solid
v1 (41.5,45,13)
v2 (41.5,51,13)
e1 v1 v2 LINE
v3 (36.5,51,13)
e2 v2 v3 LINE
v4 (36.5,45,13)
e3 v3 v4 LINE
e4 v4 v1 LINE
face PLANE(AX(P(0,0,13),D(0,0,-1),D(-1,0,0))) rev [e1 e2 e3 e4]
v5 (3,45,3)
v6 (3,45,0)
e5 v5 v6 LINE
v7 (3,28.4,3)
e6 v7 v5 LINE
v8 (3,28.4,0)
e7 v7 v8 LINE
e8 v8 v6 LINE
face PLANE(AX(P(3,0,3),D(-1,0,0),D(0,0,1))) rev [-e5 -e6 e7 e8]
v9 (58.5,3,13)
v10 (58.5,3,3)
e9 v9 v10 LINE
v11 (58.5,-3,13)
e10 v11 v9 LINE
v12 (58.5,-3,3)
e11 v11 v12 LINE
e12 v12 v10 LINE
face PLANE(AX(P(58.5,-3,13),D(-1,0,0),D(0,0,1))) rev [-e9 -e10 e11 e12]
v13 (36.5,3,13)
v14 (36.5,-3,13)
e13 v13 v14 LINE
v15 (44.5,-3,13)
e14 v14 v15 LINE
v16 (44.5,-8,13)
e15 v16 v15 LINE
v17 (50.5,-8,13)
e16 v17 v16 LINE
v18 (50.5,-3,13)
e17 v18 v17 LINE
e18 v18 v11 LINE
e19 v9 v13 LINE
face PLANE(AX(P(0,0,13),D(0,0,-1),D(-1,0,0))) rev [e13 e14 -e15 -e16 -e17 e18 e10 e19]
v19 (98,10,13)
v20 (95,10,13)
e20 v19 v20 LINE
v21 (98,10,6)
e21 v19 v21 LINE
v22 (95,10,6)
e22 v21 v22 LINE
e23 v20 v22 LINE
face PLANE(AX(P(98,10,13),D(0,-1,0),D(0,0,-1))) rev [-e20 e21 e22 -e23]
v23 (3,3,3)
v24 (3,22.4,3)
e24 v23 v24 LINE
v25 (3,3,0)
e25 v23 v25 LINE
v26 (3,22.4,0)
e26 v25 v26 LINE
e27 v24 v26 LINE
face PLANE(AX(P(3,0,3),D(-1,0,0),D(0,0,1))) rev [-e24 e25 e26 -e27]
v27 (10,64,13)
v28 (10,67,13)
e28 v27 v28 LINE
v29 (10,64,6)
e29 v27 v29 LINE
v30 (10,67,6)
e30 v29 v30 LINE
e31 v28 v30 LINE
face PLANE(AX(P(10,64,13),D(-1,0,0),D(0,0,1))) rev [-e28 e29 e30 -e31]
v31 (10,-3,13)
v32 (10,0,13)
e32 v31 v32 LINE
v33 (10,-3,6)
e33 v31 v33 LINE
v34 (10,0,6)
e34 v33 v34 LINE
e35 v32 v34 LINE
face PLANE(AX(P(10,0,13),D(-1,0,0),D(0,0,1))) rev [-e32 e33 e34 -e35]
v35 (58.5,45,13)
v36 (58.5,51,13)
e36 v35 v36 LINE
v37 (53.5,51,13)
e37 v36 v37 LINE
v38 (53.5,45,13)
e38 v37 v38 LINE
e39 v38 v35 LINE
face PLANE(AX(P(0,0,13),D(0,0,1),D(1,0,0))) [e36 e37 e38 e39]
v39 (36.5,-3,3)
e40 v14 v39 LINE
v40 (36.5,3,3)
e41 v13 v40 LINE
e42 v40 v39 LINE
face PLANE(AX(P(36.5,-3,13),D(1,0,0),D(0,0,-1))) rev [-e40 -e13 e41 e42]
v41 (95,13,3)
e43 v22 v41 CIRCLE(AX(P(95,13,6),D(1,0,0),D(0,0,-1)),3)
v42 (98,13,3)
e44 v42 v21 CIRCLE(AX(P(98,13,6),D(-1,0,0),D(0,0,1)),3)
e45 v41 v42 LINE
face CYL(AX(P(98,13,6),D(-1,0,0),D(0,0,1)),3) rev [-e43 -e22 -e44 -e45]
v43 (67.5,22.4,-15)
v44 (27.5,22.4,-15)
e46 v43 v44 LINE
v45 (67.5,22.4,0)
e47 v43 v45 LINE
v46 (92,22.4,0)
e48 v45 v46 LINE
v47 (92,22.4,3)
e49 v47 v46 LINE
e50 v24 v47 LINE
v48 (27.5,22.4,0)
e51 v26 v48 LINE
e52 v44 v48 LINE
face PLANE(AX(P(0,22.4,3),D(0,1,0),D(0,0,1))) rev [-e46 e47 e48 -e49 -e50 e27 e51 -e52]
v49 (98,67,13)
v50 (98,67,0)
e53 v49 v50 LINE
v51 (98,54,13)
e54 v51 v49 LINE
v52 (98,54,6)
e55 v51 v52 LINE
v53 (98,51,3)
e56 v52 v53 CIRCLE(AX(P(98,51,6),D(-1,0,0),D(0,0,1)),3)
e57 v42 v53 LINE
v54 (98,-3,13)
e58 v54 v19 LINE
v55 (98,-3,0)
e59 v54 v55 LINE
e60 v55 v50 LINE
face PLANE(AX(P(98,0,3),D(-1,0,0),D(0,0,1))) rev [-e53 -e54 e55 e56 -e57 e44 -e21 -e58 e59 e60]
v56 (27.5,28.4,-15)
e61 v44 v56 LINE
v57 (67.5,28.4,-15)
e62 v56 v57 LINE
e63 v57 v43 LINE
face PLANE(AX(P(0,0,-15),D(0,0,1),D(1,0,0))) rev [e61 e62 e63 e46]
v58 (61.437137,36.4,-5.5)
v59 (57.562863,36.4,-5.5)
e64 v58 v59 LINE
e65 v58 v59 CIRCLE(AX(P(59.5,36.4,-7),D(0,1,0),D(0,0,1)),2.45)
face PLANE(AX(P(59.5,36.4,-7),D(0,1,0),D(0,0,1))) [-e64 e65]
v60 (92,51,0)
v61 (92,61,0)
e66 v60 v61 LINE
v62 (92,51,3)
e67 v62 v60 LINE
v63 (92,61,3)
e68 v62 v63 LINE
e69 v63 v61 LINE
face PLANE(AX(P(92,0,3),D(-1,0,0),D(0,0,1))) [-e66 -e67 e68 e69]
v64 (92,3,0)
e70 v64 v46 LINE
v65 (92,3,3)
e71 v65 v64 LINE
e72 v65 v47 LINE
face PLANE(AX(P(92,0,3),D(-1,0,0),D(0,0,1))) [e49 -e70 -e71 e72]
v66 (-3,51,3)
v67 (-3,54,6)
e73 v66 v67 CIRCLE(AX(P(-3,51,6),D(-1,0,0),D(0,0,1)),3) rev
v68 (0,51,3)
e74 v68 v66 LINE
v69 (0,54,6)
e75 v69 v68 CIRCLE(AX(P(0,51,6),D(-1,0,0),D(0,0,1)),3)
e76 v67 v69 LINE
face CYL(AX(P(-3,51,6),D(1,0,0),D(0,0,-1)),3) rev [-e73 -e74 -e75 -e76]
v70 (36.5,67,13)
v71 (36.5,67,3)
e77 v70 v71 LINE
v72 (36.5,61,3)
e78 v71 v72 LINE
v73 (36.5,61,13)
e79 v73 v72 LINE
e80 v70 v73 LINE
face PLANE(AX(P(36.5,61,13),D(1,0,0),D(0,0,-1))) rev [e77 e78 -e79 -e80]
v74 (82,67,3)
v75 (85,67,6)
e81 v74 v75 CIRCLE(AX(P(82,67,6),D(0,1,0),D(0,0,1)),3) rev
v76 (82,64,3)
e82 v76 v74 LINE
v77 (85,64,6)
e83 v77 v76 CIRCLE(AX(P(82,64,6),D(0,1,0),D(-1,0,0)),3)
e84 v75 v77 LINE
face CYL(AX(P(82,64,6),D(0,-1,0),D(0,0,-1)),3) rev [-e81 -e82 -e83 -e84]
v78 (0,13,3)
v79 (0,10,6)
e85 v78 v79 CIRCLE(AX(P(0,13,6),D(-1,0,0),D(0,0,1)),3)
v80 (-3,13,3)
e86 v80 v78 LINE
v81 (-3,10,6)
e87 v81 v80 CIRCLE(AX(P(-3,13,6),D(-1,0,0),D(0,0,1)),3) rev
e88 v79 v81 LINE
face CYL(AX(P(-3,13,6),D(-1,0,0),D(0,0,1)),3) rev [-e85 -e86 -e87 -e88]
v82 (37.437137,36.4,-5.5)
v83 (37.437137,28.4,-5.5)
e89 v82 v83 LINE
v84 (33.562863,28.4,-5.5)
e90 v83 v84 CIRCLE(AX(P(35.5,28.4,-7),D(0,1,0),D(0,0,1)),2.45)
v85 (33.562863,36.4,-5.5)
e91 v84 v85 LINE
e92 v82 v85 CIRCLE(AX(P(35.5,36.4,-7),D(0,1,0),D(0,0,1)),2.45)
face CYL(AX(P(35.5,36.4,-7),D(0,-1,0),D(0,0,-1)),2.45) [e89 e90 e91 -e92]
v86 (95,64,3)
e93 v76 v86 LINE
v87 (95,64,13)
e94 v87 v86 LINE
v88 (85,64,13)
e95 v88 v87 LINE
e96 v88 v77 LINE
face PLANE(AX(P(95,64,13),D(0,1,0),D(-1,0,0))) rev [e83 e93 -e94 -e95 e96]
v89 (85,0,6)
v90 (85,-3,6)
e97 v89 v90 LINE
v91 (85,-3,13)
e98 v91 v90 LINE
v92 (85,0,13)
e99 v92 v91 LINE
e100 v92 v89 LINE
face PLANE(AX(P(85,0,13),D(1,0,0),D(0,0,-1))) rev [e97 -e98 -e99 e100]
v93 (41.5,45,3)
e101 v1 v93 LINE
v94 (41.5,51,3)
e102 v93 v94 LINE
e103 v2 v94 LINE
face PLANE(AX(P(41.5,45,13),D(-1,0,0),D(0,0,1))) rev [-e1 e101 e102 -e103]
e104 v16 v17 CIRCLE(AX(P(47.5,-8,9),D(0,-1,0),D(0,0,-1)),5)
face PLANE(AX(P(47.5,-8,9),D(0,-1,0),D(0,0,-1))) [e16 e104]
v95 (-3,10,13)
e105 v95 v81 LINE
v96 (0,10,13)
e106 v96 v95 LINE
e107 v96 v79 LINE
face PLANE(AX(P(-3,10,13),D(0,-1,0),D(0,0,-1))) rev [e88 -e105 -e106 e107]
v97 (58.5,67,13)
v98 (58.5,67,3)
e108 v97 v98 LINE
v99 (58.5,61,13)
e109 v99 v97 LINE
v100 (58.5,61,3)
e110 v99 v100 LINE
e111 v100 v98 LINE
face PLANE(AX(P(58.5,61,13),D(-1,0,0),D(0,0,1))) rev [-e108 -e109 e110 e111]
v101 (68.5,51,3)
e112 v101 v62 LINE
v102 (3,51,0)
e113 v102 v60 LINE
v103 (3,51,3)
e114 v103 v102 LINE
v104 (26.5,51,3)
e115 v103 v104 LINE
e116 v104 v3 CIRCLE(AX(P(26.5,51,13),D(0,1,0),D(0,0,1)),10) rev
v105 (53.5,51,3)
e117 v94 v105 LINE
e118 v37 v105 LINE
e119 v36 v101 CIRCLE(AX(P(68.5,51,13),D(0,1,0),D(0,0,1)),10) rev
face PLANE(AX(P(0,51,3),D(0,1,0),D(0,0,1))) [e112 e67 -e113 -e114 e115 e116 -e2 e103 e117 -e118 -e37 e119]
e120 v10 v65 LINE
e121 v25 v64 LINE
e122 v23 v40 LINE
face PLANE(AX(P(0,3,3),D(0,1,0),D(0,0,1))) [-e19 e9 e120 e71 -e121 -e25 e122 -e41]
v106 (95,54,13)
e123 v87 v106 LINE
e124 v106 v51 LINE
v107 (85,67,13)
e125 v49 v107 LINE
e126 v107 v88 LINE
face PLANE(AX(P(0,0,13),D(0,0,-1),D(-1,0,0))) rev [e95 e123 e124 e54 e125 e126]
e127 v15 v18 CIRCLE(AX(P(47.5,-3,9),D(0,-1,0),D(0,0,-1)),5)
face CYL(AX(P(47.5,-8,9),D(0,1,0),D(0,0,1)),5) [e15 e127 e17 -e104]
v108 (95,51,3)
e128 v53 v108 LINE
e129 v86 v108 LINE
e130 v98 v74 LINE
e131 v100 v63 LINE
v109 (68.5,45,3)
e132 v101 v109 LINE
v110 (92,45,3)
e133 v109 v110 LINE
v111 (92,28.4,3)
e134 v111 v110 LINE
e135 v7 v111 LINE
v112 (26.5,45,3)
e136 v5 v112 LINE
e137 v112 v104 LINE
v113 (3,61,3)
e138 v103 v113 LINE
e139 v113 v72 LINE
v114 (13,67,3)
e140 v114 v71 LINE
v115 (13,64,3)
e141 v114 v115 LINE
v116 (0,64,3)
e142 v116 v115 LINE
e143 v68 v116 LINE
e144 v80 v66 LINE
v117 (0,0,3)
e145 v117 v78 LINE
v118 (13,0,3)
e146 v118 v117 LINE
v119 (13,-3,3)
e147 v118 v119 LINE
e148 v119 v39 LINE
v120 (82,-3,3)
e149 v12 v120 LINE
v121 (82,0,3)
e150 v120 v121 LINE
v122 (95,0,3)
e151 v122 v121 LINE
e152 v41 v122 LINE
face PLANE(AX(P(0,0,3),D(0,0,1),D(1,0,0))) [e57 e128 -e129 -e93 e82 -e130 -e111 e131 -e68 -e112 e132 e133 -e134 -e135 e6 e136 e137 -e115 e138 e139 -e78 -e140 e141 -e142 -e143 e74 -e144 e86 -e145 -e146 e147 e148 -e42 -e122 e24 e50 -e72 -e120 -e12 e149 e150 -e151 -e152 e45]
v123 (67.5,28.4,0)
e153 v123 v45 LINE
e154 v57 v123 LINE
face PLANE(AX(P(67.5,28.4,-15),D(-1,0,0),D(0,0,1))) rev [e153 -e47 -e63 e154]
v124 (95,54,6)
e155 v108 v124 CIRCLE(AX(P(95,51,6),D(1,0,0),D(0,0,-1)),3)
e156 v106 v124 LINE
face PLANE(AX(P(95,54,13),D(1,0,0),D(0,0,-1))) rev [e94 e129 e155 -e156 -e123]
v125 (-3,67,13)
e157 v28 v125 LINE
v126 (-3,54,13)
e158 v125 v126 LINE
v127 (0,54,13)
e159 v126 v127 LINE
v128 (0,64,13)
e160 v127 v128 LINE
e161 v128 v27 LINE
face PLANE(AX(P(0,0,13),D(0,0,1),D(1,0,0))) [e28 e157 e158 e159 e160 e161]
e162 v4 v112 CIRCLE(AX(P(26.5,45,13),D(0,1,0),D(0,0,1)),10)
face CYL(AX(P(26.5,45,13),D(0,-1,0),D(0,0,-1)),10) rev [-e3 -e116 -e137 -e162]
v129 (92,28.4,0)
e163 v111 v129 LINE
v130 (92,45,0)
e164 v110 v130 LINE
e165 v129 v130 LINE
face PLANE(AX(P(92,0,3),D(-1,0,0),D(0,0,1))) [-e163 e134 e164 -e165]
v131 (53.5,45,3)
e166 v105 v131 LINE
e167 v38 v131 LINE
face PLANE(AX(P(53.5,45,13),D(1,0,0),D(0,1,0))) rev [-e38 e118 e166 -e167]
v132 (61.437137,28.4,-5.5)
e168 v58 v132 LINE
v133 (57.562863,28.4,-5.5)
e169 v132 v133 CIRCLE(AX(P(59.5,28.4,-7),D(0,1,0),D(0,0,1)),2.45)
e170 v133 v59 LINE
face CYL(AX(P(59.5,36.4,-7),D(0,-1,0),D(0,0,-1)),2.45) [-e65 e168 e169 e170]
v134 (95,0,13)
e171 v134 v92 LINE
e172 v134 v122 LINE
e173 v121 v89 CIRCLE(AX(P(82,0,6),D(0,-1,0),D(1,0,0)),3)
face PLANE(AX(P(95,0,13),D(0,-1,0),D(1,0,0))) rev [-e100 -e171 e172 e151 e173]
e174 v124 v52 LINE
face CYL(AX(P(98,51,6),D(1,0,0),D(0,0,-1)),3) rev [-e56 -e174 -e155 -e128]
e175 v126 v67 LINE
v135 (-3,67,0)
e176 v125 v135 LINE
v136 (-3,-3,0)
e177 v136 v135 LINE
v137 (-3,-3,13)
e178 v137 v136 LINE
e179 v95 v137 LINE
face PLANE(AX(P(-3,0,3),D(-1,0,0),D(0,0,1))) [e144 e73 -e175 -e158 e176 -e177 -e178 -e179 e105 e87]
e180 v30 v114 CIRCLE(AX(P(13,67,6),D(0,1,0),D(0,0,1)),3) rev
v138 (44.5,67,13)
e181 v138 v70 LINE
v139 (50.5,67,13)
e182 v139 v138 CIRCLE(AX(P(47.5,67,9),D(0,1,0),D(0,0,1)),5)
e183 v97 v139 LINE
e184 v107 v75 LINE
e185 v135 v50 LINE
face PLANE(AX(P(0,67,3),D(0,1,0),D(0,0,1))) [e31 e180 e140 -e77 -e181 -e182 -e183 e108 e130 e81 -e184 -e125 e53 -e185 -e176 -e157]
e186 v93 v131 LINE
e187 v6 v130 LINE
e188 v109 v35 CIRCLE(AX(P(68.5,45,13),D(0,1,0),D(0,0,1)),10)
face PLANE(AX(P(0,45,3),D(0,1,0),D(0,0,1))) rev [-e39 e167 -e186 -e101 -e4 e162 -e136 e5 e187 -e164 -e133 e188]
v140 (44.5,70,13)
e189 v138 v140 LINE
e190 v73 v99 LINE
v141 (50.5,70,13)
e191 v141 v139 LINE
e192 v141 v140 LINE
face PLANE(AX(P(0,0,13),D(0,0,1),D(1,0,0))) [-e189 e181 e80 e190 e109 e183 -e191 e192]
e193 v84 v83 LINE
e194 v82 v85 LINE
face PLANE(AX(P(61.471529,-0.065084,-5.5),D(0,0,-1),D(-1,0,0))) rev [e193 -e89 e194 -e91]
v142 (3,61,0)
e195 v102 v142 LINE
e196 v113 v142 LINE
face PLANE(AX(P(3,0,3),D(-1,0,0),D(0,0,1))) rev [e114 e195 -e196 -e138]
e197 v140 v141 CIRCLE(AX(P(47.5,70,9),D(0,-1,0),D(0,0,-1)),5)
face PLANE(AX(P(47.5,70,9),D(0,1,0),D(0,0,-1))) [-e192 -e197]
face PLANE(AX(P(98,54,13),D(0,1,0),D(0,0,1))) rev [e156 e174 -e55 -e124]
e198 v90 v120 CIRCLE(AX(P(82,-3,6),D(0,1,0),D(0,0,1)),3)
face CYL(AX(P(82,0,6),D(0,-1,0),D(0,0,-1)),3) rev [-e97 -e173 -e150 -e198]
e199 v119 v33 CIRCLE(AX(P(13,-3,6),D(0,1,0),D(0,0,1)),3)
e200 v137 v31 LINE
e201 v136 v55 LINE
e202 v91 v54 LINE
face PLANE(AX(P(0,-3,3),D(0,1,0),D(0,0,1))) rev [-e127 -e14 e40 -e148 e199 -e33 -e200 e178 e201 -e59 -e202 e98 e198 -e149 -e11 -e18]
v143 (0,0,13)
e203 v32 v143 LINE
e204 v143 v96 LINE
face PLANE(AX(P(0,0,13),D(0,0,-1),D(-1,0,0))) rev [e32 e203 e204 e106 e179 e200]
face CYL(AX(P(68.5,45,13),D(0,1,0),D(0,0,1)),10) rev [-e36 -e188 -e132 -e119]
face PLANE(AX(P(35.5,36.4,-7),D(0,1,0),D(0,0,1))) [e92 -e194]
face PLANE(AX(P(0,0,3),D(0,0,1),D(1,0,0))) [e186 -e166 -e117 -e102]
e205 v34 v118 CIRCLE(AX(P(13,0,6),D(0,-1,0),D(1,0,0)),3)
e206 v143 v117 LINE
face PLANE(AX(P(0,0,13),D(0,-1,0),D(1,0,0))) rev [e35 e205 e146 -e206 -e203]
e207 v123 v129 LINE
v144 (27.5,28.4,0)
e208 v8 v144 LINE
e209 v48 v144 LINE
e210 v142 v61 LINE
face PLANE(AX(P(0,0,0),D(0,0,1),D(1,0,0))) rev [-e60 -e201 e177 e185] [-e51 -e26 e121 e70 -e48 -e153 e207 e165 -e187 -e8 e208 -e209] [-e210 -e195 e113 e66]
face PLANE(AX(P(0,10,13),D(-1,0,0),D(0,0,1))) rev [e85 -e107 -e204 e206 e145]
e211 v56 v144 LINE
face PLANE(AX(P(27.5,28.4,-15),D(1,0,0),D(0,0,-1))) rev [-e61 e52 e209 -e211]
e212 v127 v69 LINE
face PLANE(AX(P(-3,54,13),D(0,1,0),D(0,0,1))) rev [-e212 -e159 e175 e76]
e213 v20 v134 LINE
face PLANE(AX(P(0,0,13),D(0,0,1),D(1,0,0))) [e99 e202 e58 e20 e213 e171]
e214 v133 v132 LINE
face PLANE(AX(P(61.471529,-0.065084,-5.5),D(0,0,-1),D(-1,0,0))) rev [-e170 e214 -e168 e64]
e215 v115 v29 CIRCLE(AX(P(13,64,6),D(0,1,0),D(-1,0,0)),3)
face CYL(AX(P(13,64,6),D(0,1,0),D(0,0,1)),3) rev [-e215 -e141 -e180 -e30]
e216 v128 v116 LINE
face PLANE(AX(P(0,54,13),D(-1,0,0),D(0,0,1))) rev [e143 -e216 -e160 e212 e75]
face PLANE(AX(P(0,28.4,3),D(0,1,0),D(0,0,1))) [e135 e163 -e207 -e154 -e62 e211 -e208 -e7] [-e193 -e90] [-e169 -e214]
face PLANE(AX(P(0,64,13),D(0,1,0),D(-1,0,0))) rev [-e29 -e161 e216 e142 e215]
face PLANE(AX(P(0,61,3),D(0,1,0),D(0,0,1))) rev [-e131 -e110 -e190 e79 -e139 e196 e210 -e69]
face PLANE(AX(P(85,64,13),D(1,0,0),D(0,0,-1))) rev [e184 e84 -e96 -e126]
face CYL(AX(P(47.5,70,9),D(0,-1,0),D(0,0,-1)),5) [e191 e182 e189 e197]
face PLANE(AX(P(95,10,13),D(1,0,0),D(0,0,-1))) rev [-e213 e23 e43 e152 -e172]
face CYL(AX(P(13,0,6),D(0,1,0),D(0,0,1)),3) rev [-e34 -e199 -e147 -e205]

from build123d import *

# Parameters (mm, degrees)
CROQUIS1_W              = 101
CROQUIS1_H              = 70
CROQUIS1_W_2            = 89
CROQUIS1_H_2            = 58
CROQUIS1_H_3            = 6
SALIENTE_EXTRUIR1_DEPTH = 3
SALIENTE_EXTRUIR2_DEPTH = 10
CROQUIS3_W              = 5
CROQUIS3_H              = 6
SALIENTE_EXTRUIR3_DEPTH = 10
REDONDEO1_R             = 10
REDONDEO2_R             = 3
CROQUIS5_W              = 40
CROQUIS5_H              = 6
SALIENTE_EXTRUIR4_DEPTH = 15
CROQUIS6_R              = 2.45
SALIENTE_EXTRUIR5_DEPTH = 8
CROQUIS7_W              = 22
CROQUIS7_H              = 6
SALIENTE_EXTRUIR6_DEPTH = 10
CROQUIS8_R              = 5
SALIENTE_EXTRUIR7_DEPTH = 5
CROQUIS9_W              = 22
CROQUIS9_H              = 19.446808743
CORTAR_EXTRUIR1_DEPTH   = 119.004237212
CROQUIS10_W             = 28.262492251
CROQUIS10_H             = 3.390066726
CORTAR_EXTRUIR2_DEPTH   = 8


with BuildPart() as part:
    # Croquis1 → Saliente-Extruir1 (new body)
    # profile 1 of 3: a face of its own
    with BuildSketch(Plane.XY):
        with Locations((47.5, 32)):
            Rectangle(CROQUIS1_W, CROQUIS1_H)
        with Locations((47.5, 32)):
            Rectangle(CROQUIS1_W_2, CROQUIS1_H_2, mode=Mode.SUBTRACT)
    # profile 2 of 3: a face of its own
    with BuildSketch(Plane.XY):
        with Locations((47.5, 48)):
            Rectangle(CROQUIS1_W_2, CROQUIS1_H_3)
    # profile 3 of 3: a face of its own
    with BuildSketch(Plane.XY):
        with Locations((47.5, 25.4)):
            Rectangle(CROQUIS1_W_2, CROQUIS1_H_3)
    extrude(amount=SALIENTE_EXTRUIR1_DEPTH)

    # Croquis2 → Saliente-Extruir2 (add)
    with BuildSketch(Plane.XY.offset(3)):
        Polygon((85, 67), (98, 67), (98, 54), (95, 54), (95, 64), (85, 64), align=None)
        Polygon((10, 64), (10, 67), (-3, 67), (-3, 54), (0, 54), (0, 64), align=None)
        Polygon((10, -3), (-3, -3), (-3, 10), (0, 10), (0, 0), (10, 0), align=None)
        Polygon((85, 0), (85, -3), (98, -3), (98, 10), (95, 10), (95, 0), align=None)
    extrude(amount=SALIENTE_EXTRUIR2_DEPTH)

    # Croquis3 → Saliente-Extruir3 (add)
    with BuildSketch(Plane.XY.offset(3)):
        with Locations((56, 48)):
            Rectangle(CROQUIS3_W, CROQUIS3_H)
        with Locations((39, 48)):
            Rectangle(CROQUIS3_W, CROQUIS3_H)
    extrude(amount=SALIENTE_EXTRUIR3_DEPTH)

    # Redondeo1
    redondeo1_edges = [part.edges().sort_by_distance(p)[0] for p in [
        (36.5, 48, 3),
        (58.5, 48, 3),
    ]]
    fillet(redondeo1_edges, radius=REDONDEO1_R - 0.0001)  # a hair under: the kernel refuses the full size

    # Redondeo2
    redondeo2_edges = [part.edges().sort_by_distance(p)[0] for p in [
        (85, -1.5, 3),
        (96.5, 10, 3),
        (85, 65.5, 3),
        (96.5, 54, 3),
        (10, 65.5, 3),
        (-1.5, 54, 3),
        (10, -1.5, 3),
        (-1.5, 10, 3),
    ]]
    fillet(redondeo2_edges, radius=REDONDEO2_R)

    # Croquis5 → Saliente-Extruir4 (add)
    with BuildSketch(Plane(origin=(0, 0, 0), x_dir=(-1, 0, 0), z_dir=(0, 0, -1))):
        with Locations((-47.5, 25.4)):
            Rectangle(CROQUIS5_W, CROQUIS5_H)
    extrude(amount=SALIENTE_EXTRUIR4_DEPTH)

    # Croquis6 → Saliente-Extruir5 (add)
    with BuildSketch(Plane(origin=(0, 28.4, 0), x_dir=(1, 0, 0), z_dir=(0, 1, 0))):
        with Locations(Location((35.5, 7, 0), (0, 0, 270))):
            Circle(CROQUIS6_R)
        with Locations(Location((59.5, 7, 0), (0, 0, 270))):
            Circle(CROQUIS6_R)
    extrude(amount=SALIENTE_EXTRUIR5_DEPTH)

    # Croquis7 → Saliente-Extruir6 (add, through all)
    with BuildSketch(Plane.XY.offset(3)):
        with Locations((47.5, 0)):
            Rectangle(CROQUIS7_W, CROQUIS7_H)
        with Locations((47.5, 64)):
            Rectangle(CROQUIS7_W, CROQUIS7_H)
    extrude(amount=SALIENTE_EXTRUIR6_DEPTH)

    # Croquis8 → Saliente-Extruir7 (add)
    with BuildSketch(Plane.XZ.offset(3)):
        with Locations(Location((47.5, 9, 0), (0, 0, 126.869897646))):
            Circle(CROQUIS8_R)
    saliente_extruir7 = extrude(amount=SALIENTE_EXTRUIR7_DEPTH)

    # Croquis9 → Cortar-Extruir1 (cut, through all)
    with BuildSketch(Plane(origin=(0, 3, 0), x_dir=(1, 0, 0), z_dir=(0, 1, 0))):
        with Locations((47.5, -22.723404372)):
            Rectangle(CROQUIS9_W, CROQUIS9_H)
    cortar_extruir1 = extrude(amount=-CORTAR_EXTRUIR1_DEPTH, mode=Mode.SUBTRACT)

    # Simetría1: Saliente-Extruir7, Cortar-Extruir1 across plane
    add(saliente_extruir7.mirror(Plane.ZX.offset(31)))
    add(cortar_extruir1.mirror(Plane.ZX.offset(31)), mode=Mode.SUBTRACT)

    # Croquis10 → Cortar-Extruir2 (cut)
    with BuildSketch(Plane(origin=(0, 36.4, 0), x_dir=(1, 0, 0), z_dir=(0, 1, 0))):
        with Locations((47.340282602, 3.804966637)):
            Rectangle(CROQUIS10_W, CROQUIS10_H)
    extrude(amount=-CORTAR_EXTRUIR2_DEPTH, mode=Mode.SUBTRACT)


solid = part.part
